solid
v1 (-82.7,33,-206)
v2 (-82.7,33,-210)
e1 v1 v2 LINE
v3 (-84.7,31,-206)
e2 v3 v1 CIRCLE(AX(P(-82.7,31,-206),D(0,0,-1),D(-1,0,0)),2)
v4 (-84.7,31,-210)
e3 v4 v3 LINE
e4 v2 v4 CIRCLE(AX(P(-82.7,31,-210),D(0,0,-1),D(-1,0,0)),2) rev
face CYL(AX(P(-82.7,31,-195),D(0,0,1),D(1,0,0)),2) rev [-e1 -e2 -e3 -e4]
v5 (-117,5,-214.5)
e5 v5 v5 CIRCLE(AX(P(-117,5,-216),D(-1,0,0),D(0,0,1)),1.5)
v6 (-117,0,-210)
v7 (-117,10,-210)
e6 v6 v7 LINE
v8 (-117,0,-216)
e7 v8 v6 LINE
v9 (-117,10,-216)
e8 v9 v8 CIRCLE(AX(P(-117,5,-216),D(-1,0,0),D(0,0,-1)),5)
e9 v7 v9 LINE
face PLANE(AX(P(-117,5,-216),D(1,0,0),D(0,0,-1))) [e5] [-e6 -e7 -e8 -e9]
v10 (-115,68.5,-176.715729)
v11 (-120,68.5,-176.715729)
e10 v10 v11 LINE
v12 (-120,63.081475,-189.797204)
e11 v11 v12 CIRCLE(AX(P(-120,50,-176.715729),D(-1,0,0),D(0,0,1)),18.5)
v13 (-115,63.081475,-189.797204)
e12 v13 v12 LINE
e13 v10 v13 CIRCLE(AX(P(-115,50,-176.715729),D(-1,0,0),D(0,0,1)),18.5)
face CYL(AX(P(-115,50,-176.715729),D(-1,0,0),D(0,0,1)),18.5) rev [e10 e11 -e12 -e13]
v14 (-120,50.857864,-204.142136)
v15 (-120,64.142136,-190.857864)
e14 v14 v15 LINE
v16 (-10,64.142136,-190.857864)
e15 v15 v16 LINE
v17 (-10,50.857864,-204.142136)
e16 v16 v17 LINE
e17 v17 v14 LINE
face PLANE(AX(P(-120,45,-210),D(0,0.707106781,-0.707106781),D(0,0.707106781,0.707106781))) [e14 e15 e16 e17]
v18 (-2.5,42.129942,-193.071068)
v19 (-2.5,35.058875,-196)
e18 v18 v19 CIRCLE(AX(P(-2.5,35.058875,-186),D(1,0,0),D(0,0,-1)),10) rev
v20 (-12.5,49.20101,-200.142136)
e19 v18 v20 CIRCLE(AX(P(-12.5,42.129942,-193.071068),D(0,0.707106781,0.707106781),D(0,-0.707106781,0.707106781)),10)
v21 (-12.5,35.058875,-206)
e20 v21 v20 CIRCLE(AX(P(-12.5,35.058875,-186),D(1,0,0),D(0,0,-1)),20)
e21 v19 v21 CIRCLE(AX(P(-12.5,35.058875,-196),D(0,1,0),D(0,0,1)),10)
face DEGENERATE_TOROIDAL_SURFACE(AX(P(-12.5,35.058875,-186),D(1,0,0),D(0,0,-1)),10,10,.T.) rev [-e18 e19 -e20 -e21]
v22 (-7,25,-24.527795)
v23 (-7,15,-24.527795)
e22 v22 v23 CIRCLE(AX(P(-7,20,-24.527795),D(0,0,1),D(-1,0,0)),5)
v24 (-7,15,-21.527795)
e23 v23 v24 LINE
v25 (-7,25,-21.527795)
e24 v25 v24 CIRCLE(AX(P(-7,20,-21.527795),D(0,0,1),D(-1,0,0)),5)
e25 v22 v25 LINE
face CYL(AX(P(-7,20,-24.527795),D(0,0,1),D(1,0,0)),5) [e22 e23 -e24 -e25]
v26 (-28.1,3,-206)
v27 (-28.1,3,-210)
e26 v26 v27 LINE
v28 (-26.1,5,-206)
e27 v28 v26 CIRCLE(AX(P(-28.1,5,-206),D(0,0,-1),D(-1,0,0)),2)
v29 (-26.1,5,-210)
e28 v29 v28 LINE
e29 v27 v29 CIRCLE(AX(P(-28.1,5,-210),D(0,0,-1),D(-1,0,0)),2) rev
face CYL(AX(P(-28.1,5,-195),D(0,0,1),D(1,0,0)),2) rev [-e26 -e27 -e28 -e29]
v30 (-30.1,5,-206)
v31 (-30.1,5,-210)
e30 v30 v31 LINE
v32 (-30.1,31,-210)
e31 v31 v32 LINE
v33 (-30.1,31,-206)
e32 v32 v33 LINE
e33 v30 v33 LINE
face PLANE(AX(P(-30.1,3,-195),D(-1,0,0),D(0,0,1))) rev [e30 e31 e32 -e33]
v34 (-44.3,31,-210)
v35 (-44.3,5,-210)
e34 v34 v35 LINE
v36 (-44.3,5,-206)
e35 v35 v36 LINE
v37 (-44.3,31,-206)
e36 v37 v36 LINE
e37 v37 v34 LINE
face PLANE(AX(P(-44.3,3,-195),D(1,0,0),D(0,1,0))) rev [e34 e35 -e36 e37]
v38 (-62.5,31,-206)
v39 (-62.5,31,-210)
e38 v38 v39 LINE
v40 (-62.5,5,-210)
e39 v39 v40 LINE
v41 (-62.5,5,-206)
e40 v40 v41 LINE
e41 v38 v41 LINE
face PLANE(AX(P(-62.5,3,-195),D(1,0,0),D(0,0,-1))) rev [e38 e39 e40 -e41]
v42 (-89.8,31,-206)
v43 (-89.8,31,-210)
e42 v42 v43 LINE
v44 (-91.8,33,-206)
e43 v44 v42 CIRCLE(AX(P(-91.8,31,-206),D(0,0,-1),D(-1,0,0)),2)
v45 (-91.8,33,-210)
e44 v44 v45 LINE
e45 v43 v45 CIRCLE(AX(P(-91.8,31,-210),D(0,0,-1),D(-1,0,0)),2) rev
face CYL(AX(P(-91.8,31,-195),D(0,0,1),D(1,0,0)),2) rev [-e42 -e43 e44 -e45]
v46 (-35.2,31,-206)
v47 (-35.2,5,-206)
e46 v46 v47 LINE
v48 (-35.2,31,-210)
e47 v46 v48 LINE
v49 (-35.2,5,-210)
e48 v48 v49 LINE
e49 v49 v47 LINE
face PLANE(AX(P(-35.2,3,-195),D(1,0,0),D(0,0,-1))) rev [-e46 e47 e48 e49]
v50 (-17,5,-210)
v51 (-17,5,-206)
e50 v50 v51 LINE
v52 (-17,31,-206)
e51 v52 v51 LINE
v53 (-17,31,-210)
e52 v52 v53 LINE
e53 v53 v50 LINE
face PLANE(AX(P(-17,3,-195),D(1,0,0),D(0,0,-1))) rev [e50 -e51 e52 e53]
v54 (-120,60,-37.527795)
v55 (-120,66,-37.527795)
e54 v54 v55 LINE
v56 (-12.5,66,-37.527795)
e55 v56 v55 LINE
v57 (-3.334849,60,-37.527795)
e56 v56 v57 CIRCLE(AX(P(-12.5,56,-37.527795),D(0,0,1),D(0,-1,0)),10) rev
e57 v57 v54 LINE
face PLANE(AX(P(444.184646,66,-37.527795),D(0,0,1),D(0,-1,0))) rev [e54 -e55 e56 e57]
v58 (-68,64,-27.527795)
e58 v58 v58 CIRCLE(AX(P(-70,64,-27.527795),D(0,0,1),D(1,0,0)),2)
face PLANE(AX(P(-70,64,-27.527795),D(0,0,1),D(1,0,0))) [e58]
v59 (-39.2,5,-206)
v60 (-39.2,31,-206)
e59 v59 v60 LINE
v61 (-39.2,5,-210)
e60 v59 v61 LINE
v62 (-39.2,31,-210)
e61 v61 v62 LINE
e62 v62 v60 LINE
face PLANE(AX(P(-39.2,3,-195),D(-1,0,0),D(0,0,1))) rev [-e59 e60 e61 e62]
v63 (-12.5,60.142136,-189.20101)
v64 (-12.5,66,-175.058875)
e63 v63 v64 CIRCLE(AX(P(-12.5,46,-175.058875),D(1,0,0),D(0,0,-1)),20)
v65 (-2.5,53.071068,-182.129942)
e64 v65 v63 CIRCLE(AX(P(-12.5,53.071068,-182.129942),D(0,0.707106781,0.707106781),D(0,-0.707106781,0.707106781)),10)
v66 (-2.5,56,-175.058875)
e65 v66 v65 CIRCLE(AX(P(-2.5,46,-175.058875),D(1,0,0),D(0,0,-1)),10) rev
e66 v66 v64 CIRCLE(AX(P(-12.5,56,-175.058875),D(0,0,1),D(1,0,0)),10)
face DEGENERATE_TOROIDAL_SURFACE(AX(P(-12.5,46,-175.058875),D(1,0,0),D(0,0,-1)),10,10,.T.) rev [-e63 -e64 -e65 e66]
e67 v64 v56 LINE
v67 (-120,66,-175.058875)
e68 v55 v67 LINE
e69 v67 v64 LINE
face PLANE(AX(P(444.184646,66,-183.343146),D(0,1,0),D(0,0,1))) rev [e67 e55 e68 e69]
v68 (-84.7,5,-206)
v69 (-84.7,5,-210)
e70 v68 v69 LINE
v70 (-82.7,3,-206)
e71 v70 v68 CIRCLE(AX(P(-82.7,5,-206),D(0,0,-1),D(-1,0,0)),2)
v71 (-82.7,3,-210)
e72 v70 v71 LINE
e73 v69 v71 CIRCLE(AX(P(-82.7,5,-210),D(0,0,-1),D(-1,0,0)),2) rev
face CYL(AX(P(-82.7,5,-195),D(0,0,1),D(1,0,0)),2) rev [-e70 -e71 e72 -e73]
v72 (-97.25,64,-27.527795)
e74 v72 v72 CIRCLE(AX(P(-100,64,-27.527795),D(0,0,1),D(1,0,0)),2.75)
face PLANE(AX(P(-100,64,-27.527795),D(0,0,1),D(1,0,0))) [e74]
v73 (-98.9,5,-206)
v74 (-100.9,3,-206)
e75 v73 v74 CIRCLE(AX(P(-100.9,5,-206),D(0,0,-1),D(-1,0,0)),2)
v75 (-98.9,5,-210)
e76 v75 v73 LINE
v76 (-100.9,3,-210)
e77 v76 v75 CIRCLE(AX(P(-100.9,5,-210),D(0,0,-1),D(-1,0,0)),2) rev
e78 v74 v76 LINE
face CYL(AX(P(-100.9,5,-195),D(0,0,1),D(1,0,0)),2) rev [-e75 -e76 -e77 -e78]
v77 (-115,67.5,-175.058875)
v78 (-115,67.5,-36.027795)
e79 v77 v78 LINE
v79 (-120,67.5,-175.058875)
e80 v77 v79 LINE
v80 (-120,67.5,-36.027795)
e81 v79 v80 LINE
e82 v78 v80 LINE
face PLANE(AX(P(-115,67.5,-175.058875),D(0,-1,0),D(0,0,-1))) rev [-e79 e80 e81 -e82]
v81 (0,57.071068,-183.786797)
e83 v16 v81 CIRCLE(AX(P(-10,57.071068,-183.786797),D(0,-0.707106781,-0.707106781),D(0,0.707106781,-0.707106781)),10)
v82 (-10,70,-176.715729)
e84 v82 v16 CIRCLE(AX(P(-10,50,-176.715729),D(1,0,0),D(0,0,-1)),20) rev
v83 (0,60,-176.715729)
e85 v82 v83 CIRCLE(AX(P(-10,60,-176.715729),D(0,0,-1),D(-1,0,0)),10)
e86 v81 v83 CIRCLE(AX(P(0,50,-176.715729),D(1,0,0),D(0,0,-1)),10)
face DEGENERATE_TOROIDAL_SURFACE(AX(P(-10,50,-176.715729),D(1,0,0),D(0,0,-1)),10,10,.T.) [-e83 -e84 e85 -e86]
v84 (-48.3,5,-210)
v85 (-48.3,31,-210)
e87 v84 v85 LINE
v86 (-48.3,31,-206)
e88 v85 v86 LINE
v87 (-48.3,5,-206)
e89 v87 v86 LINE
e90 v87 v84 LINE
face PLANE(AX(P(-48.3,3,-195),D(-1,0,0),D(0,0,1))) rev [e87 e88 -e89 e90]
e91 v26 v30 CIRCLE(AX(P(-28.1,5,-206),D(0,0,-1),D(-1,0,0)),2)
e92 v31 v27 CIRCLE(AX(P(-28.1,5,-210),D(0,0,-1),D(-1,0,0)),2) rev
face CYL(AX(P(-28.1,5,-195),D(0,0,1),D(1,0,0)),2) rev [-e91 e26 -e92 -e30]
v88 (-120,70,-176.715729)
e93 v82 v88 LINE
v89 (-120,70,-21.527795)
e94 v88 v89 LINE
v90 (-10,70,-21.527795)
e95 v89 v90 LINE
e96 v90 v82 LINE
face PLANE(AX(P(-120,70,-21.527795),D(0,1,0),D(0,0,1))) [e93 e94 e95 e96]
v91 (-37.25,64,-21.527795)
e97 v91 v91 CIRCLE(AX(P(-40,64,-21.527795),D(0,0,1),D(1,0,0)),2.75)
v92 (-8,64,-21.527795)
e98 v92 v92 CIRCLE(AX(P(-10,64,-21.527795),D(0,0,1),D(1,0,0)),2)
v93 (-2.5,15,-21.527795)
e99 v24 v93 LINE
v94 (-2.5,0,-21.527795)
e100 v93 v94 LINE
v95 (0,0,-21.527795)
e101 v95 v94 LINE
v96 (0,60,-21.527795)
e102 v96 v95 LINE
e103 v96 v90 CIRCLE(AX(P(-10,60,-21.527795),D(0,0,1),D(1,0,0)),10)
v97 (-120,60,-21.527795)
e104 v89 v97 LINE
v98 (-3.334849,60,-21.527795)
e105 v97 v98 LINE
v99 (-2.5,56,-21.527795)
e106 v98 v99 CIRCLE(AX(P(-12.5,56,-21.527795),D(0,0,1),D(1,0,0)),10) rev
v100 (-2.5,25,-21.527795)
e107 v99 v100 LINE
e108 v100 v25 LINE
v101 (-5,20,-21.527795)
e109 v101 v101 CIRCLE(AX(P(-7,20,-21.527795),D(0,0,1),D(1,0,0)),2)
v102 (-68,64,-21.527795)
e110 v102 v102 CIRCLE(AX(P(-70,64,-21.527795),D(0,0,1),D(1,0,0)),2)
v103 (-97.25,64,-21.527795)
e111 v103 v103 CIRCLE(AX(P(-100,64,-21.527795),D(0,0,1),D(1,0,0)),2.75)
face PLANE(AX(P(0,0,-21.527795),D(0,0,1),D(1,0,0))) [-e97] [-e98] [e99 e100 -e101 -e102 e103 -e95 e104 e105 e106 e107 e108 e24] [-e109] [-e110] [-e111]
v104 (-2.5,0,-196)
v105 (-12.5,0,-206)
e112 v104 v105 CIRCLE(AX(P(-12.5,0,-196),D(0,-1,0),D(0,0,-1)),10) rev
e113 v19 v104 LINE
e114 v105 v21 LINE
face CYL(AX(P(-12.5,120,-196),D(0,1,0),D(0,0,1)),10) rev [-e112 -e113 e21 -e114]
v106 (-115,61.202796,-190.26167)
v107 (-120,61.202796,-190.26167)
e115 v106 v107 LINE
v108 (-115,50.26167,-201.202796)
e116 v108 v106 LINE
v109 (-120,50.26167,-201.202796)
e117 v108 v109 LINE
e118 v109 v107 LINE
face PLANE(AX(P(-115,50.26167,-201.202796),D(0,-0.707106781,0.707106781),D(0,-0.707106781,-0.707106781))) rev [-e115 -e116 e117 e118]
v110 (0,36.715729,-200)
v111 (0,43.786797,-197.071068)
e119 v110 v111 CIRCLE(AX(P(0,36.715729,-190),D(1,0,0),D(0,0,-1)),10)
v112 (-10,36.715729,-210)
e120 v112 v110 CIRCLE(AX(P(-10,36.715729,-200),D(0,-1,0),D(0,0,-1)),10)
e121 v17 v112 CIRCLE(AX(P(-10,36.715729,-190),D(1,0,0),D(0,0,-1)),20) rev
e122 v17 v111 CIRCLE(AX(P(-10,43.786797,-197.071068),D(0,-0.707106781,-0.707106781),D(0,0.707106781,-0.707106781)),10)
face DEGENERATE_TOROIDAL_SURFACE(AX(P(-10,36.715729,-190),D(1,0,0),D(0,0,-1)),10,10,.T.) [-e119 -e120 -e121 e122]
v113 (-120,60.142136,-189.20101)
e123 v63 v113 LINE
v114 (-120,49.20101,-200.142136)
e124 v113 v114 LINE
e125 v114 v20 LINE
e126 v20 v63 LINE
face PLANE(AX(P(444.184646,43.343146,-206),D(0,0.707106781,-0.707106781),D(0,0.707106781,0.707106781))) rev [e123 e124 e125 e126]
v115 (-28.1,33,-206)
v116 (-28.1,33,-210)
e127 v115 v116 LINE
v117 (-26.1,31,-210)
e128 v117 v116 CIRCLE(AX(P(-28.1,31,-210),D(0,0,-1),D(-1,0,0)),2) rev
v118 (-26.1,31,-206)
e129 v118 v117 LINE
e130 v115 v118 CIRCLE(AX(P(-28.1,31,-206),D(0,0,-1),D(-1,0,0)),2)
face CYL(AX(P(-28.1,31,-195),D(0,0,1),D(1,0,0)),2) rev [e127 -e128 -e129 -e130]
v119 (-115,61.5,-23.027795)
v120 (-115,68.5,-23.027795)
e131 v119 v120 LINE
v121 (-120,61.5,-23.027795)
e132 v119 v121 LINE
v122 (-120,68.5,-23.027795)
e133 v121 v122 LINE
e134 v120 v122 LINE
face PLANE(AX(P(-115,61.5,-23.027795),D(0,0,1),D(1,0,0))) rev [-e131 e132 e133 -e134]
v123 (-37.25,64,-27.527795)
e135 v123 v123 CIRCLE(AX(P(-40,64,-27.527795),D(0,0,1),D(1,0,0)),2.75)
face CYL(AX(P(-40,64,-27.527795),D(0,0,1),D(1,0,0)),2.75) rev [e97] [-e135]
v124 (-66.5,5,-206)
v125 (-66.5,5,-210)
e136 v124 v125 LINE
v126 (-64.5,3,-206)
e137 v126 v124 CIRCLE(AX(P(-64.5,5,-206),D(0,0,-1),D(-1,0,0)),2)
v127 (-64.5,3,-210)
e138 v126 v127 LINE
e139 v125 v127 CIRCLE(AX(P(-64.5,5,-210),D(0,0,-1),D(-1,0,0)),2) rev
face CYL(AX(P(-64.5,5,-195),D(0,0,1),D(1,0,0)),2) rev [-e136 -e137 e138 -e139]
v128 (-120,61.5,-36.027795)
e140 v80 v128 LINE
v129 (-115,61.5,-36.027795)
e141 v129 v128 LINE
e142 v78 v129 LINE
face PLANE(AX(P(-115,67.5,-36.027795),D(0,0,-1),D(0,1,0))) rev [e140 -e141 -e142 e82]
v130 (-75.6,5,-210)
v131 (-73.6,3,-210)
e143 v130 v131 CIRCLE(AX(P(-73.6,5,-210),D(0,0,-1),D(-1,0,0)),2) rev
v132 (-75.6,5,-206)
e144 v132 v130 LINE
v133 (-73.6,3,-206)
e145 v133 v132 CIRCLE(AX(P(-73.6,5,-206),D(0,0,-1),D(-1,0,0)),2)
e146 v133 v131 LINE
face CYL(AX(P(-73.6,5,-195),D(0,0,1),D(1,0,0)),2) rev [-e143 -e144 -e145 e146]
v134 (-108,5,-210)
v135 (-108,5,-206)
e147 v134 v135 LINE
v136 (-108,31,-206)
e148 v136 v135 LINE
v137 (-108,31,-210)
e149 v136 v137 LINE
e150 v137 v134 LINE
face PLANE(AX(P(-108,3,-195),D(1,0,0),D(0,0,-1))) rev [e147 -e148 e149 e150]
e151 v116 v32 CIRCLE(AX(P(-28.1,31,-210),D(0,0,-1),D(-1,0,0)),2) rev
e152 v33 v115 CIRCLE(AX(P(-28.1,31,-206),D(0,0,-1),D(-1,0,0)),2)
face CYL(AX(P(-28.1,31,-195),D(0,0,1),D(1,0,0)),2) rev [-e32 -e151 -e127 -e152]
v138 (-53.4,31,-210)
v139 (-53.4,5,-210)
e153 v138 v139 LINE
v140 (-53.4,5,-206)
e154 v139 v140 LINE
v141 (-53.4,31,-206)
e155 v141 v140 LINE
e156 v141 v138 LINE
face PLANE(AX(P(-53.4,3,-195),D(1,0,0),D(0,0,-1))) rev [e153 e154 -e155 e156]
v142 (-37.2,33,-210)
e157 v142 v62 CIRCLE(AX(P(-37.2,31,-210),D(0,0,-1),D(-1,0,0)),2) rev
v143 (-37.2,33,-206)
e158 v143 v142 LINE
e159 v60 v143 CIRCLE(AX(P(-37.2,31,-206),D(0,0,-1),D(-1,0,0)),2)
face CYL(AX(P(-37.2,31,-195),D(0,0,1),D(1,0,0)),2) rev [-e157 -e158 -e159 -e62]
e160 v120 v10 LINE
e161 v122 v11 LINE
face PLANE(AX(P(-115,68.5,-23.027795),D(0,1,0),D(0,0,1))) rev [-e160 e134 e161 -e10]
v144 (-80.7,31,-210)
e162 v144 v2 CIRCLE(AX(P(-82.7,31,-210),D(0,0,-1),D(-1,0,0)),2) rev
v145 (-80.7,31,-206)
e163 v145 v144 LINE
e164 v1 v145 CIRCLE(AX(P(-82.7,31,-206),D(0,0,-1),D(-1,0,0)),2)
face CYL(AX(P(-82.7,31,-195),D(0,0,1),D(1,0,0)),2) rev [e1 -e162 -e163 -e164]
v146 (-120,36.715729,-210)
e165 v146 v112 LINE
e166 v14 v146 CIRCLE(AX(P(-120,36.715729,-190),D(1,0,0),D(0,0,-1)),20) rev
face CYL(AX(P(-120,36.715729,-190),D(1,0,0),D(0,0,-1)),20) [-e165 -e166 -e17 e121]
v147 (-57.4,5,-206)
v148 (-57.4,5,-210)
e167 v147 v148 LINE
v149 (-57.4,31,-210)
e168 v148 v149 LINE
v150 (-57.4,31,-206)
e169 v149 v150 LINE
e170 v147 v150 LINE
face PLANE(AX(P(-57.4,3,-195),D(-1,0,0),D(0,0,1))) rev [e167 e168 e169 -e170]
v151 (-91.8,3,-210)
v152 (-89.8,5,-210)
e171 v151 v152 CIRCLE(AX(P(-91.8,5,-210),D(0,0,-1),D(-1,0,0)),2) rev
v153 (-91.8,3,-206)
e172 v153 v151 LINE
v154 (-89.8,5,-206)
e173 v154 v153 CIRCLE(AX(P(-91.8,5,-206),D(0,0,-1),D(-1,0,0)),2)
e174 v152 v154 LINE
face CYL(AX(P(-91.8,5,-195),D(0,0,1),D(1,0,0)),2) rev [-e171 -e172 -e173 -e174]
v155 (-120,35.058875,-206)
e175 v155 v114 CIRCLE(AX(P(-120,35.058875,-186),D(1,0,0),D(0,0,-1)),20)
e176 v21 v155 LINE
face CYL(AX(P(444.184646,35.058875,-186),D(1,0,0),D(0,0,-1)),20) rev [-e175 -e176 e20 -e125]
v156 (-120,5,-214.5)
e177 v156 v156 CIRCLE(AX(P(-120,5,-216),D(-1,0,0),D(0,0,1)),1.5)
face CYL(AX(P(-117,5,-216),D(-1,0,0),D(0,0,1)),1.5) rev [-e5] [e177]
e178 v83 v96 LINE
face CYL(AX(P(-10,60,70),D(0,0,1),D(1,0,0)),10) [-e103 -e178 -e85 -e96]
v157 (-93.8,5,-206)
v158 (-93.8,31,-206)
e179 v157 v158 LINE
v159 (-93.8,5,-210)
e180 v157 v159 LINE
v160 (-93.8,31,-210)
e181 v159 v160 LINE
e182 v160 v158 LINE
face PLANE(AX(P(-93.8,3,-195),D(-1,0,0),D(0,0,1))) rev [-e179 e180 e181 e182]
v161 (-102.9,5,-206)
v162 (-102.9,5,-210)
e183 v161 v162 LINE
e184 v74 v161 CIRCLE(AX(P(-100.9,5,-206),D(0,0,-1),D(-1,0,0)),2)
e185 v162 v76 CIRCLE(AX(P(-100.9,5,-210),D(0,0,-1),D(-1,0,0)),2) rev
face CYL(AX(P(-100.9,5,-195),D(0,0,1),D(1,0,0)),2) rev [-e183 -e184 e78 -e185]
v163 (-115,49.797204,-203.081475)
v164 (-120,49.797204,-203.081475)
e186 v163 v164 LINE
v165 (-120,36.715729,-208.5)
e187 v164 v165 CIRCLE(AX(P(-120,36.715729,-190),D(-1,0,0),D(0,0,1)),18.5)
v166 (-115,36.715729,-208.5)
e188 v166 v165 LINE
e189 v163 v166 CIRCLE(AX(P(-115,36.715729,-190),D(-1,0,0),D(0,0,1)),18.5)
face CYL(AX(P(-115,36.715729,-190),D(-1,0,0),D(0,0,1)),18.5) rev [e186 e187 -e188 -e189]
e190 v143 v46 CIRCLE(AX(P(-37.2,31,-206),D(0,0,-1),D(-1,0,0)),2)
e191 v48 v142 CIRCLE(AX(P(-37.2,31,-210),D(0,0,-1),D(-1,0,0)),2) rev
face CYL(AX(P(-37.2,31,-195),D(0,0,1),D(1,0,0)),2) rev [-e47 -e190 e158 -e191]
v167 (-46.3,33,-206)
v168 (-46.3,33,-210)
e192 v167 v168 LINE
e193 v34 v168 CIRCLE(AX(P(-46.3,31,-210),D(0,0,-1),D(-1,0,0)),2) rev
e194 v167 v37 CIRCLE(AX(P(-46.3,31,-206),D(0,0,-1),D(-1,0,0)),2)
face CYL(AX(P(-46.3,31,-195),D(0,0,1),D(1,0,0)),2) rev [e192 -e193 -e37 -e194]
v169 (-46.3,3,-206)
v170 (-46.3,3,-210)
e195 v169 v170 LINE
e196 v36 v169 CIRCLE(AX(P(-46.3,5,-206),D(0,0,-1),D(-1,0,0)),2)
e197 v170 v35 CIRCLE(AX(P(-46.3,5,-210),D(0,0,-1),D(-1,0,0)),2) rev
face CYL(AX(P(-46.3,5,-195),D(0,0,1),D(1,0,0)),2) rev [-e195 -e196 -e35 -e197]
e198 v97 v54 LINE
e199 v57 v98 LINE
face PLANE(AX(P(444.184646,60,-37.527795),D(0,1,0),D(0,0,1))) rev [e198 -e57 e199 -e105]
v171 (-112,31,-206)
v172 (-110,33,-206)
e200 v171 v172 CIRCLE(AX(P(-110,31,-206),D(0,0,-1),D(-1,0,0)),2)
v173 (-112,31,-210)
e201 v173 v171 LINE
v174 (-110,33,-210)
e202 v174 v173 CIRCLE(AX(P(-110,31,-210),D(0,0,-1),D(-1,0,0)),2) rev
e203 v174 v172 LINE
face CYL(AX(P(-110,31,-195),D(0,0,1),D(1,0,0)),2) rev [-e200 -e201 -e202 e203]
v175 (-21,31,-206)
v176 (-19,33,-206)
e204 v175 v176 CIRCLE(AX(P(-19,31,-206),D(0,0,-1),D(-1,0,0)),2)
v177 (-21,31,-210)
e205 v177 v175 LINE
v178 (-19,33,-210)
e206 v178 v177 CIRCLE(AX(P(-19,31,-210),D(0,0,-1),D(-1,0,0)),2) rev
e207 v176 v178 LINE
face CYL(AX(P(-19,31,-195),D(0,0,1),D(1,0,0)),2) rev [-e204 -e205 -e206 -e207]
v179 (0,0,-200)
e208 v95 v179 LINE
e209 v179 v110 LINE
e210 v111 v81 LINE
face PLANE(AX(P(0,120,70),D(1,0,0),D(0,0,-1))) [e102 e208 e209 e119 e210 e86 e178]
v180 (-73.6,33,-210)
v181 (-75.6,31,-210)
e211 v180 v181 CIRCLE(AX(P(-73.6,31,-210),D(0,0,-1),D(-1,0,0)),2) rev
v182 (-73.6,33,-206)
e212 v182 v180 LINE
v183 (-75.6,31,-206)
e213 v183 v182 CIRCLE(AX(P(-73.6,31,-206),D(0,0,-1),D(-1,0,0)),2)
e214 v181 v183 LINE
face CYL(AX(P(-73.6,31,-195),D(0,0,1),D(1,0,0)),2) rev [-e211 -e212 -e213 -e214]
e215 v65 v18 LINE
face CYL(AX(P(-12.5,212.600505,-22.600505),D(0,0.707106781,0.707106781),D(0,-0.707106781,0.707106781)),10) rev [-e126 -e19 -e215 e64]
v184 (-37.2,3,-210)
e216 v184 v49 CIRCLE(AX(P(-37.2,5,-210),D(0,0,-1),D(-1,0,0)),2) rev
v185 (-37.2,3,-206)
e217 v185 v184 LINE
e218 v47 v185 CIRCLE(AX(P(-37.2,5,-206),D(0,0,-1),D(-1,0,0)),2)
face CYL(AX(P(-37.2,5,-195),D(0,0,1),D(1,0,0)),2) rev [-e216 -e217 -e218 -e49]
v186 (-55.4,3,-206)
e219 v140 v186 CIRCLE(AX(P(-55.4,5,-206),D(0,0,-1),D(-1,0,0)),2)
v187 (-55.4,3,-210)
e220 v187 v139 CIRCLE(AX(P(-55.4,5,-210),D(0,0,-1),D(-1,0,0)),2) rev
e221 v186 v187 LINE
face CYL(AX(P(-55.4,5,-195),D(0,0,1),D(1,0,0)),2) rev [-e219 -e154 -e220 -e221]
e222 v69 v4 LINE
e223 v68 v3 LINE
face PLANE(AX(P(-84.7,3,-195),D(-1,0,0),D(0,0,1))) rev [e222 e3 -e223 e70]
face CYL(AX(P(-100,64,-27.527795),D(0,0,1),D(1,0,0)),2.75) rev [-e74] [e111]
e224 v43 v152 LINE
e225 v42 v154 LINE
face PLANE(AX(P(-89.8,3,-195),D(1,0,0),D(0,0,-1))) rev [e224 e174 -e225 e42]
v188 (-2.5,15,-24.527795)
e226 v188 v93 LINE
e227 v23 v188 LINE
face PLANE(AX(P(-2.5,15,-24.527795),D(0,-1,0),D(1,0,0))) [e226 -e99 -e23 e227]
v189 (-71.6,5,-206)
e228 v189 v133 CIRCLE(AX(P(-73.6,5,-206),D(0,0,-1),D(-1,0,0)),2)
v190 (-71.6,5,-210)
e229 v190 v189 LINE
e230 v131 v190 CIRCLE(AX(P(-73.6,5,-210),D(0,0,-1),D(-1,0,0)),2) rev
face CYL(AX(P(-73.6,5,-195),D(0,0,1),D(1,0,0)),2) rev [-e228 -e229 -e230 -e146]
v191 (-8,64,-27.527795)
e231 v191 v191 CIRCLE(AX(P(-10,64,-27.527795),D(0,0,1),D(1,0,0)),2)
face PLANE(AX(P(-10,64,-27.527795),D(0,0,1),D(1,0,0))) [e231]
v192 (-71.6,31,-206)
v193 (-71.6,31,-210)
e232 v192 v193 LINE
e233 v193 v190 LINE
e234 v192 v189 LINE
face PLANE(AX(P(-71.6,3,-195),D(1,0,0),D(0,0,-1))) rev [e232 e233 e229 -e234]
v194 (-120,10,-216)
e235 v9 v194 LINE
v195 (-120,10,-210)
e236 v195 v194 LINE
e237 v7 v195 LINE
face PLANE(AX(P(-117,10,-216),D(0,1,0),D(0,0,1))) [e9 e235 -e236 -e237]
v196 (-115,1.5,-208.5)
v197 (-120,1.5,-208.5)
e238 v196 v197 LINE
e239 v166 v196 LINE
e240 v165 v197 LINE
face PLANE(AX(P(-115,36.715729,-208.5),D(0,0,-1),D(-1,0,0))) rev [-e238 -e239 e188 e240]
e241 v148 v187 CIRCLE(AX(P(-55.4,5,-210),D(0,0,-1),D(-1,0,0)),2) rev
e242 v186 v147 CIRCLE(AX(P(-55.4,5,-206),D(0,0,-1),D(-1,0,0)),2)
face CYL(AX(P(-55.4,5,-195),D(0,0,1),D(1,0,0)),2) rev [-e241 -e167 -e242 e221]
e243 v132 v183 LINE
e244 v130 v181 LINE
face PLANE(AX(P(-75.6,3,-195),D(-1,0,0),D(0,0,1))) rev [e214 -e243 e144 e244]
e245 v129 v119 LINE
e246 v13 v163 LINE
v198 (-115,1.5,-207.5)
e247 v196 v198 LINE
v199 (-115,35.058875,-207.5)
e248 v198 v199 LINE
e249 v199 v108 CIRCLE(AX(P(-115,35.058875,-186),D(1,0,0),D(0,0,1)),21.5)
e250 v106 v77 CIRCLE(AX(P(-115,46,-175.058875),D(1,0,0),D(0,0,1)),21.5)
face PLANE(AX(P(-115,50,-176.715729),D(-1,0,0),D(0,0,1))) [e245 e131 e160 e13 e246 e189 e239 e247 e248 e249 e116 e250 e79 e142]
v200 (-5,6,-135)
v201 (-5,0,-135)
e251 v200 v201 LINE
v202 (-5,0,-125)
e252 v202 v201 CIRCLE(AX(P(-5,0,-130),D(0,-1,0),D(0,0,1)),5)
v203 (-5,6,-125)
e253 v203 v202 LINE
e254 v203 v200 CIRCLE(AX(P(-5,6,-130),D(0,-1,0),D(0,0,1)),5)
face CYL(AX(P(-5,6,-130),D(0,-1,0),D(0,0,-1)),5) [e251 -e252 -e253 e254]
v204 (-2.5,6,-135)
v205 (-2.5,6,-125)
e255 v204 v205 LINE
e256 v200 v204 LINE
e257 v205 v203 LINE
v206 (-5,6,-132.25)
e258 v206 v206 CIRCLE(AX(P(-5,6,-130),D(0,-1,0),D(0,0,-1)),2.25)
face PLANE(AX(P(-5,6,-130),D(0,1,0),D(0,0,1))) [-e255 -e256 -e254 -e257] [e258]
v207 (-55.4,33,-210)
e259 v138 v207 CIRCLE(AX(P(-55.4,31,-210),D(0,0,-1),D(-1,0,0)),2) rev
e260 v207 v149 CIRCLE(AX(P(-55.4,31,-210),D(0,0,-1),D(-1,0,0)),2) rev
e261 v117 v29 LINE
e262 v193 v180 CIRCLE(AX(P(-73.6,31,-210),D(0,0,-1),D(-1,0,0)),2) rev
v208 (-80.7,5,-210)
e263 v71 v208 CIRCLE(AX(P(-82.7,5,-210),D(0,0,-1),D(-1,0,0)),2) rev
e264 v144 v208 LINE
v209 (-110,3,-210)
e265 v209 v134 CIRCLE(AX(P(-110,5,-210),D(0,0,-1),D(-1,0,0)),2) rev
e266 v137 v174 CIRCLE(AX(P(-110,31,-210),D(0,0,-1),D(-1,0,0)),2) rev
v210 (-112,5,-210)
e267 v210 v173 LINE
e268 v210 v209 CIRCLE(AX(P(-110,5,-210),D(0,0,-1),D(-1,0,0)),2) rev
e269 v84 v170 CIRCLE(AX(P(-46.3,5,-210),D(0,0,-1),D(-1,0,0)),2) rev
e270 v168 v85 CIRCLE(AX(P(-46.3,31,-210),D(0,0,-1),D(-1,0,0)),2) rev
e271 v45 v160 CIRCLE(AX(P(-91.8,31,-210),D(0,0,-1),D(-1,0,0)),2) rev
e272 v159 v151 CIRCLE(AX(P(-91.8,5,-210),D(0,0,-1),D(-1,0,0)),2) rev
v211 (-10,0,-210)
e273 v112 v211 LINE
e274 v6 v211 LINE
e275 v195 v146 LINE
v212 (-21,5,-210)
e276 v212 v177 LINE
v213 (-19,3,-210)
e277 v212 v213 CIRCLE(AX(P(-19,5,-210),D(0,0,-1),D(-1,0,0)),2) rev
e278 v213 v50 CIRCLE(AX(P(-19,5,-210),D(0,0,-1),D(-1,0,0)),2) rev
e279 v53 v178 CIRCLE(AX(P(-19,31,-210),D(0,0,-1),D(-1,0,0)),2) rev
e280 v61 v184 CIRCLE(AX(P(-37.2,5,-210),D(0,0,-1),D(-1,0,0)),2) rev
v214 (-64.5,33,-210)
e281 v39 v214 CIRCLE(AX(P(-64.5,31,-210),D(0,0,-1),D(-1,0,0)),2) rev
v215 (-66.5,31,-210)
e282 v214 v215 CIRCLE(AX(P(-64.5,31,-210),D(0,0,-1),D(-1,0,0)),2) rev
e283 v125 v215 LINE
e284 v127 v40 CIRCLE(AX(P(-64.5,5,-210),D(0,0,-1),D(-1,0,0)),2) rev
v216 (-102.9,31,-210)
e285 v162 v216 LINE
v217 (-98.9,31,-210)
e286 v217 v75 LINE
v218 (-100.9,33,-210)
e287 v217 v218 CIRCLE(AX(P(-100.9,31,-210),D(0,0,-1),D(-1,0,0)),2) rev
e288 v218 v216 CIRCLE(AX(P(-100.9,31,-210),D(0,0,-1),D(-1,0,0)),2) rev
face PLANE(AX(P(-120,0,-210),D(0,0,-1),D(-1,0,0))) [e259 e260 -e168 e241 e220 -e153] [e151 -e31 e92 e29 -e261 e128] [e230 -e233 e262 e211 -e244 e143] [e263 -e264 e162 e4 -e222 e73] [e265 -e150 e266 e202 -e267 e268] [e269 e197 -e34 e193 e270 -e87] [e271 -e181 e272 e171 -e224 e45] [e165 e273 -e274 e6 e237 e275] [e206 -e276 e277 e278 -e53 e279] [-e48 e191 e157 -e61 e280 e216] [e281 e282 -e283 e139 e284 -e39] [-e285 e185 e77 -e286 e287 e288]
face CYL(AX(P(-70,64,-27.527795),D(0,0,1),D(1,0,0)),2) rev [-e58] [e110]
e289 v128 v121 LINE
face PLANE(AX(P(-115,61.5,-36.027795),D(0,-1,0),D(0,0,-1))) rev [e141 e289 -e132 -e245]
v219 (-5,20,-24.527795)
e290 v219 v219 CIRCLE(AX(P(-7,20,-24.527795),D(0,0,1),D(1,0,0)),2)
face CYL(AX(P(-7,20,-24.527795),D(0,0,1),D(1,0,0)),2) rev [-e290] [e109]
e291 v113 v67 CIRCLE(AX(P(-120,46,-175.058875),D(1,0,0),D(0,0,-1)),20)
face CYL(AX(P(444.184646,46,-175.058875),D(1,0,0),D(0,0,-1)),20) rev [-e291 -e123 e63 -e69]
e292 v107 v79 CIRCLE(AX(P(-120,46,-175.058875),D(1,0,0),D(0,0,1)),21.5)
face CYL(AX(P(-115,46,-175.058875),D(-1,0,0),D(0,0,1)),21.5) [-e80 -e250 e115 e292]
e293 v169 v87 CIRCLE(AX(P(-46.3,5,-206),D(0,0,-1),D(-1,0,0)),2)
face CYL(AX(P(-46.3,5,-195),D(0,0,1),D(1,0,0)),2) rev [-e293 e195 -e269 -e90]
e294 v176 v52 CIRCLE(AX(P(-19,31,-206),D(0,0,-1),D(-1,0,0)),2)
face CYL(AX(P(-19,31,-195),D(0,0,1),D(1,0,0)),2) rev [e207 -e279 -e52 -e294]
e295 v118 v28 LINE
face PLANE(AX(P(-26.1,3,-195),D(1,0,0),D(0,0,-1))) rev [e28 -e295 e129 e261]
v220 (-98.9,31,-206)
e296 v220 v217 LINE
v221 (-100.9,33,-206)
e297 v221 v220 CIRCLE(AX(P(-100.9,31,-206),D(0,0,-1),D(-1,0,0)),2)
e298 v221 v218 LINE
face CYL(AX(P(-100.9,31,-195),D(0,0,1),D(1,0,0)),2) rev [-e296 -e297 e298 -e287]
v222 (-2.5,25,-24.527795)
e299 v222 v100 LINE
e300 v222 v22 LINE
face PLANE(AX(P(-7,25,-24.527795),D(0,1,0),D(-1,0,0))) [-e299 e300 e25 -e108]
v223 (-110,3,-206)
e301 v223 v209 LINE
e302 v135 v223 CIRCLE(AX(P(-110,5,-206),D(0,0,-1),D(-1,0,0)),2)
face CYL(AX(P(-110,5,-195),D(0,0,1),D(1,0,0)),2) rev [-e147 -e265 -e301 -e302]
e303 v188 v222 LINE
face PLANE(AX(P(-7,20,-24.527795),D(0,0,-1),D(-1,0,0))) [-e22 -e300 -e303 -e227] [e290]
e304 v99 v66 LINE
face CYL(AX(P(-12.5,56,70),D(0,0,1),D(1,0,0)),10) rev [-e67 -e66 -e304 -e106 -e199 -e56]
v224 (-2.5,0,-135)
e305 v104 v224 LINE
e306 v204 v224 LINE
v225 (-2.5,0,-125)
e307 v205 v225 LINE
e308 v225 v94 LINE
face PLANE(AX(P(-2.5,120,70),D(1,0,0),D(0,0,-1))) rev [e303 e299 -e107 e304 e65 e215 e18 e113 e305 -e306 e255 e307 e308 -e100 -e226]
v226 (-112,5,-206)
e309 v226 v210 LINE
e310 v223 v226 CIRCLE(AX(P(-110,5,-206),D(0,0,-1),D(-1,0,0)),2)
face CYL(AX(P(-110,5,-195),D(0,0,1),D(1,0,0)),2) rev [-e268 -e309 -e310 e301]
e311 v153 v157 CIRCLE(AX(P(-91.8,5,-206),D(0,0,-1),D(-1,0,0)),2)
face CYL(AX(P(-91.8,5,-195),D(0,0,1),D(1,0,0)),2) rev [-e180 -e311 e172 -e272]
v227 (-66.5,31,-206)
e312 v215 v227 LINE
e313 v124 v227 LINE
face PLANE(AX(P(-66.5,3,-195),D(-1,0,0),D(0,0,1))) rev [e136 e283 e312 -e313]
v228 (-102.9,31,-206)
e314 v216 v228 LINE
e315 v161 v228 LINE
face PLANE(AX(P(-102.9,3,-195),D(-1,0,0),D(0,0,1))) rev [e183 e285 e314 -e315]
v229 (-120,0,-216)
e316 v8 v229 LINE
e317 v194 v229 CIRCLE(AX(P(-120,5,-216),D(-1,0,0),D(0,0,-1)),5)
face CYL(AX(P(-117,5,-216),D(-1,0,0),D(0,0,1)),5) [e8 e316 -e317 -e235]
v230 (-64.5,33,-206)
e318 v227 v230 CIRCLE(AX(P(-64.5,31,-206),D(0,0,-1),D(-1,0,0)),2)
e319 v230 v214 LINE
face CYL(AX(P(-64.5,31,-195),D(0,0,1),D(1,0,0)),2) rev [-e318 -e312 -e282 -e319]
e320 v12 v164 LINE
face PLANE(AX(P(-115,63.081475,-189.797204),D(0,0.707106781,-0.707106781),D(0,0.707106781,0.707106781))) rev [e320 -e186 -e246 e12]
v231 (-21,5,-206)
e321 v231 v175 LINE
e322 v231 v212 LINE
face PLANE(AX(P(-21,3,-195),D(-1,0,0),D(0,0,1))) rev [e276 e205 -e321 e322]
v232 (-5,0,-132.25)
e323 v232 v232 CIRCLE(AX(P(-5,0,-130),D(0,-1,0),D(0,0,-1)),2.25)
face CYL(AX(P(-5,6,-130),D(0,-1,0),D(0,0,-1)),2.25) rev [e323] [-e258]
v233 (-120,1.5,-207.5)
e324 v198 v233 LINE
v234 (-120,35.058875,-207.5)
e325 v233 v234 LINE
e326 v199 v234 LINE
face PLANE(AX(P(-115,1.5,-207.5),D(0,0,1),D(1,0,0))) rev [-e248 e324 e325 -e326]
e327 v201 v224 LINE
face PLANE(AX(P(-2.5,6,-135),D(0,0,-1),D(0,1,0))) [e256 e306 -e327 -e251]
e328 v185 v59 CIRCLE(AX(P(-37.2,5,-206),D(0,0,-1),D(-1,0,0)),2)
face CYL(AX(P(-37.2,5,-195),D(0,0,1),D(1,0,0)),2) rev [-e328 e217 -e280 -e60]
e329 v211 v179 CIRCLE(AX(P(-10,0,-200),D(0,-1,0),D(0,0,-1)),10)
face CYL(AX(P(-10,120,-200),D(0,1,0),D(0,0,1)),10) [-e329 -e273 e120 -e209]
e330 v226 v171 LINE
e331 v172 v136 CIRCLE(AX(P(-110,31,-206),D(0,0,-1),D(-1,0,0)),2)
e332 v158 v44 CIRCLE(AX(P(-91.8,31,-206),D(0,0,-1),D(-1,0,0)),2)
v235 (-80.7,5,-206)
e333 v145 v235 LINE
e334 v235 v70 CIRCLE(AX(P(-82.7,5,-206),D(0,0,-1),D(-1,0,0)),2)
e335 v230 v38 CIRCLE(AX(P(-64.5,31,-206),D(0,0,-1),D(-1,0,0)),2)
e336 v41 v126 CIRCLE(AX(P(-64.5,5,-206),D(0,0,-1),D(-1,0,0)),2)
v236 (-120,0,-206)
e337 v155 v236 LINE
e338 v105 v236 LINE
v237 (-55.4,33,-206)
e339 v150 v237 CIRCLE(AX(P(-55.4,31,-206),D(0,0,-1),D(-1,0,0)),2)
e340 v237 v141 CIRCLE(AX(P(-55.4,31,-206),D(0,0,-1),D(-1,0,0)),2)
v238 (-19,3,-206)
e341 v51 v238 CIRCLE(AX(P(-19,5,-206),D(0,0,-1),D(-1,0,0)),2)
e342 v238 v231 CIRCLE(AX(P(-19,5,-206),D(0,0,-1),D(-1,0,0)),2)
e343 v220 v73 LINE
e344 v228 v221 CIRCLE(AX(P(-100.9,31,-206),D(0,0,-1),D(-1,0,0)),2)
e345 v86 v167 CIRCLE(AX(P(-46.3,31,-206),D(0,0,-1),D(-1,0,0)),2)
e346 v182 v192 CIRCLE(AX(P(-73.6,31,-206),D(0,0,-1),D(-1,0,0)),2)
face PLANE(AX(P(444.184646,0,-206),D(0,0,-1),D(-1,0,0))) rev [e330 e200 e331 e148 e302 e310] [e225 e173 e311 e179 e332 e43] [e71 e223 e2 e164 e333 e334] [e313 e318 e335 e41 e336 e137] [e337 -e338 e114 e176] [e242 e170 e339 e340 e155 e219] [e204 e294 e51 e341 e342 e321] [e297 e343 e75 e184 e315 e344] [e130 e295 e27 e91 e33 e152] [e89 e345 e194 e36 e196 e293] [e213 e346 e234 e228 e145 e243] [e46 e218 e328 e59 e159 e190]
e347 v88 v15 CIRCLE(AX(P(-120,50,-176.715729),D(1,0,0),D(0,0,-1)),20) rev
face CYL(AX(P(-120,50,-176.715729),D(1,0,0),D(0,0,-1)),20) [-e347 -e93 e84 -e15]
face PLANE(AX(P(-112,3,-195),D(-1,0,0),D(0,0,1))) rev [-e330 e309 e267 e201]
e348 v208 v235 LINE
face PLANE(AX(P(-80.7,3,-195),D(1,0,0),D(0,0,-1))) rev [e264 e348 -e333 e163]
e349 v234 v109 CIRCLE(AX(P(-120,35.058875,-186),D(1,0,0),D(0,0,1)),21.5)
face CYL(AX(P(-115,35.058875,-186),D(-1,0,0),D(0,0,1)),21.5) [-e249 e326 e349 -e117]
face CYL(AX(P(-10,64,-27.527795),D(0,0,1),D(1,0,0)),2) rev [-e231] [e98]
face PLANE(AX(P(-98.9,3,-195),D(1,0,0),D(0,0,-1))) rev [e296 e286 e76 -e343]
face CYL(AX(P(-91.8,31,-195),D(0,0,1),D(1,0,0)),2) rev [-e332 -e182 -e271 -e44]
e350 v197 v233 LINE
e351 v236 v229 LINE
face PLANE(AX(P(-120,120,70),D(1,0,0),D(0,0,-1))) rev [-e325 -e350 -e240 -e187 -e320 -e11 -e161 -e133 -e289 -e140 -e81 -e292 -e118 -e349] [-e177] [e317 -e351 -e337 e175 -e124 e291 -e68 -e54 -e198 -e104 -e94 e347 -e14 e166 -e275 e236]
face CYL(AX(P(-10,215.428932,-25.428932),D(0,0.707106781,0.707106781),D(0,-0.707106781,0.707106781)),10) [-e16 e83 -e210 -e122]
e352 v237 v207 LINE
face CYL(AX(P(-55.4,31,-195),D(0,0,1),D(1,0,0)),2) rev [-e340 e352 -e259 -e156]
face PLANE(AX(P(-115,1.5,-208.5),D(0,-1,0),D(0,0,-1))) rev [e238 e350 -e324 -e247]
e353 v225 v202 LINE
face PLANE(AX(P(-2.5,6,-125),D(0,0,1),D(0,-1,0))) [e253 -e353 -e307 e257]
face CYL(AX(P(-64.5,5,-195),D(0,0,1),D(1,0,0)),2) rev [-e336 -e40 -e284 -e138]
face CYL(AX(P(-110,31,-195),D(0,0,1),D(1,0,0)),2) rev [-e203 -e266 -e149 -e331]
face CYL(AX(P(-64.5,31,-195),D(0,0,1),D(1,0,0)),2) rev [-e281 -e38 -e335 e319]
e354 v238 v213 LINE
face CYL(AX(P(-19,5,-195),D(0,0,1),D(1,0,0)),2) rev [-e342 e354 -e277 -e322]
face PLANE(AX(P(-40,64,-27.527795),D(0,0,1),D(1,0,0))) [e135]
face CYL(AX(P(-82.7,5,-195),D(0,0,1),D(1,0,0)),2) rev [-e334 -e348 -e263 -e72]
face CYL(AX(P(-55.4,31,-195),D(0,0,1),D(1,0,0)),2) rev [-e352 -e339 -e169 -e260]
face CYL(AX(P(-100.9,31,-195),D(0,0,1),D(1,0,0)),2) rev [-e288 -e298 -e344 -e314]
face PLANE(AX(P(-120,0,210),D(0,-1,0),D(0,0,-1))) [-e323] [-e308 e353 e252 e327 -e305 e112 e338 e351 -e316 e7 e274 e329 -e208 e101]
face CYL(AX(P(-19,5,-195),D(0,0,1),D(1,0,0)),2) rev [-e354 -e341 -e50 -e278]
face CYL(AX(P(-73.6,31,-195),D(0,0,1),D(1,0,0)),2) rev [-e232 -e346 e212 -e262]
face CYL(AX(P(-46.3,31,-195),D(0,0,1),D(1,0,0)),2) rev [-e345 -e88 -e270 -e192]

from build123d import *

# Parameters (mm, degrees)
CROQUIS1_R              = 13
SALIENTE_EXTRUIR1_DEPTH = 120
CORTAR_EXTRUIR1_DEPTH   = 117.5
REDONDEO1_R             = 20
CROQUIS3_W              = 250
CROQUIS3_H              = 250
CORTAR_EXTRUIR2_DEPTH   = 312.295872079
CORTAR_EXTRUIR4_DEPTH   = 5
CROQUIS7_R              = 2.75
CROQUIS7_R_2            = 2
CORTAR_EXTRUIR5_DEPTH   = 6
REDONDEO5_R             = 10
CROQUIS8_W              = 4
CROQUIS8_H              = 30
CORTAR_EXTRUIR6_DEPTH   = 15
REDONDEO6_R             = 2
CROQUIS9_R              = 2.25
SALIENTE_EXTRUIR3_DEPTH = 6
CROQUIS10_R             = 1.5
SALIENTE_EXTRUIR4_DEPTH = 3
CROQUIS11_R             = 2
SALIENTE_EXTRUIR5_DEPTH = 3


with BuildPart() as part:
    # Croquis1 → Saliente-Extruir1 (new body)
    with BuildSketch(Plane(origin=(0, 0, 0), x_dir=(0, 0, -1), z_dir=(1, 0, 0))):
        with BuildLine():
            Line((-210, 0), (210, 0))
            Line((210, 0), (210, 45))
            Line((210, 45), (185, 70))
            Line((185, 70), (21.52779525, 70))
            Line((21.52779525, 70), (21.52779525, 75))
            Line((21.52779525, 75), (-28.77527986, 148.293505427))
            ThreePointArc((-28.77527986, 148.293505427), (-68.645544514, 169.981651137), (-109.631887894, 150.484643051))
            Line((-109.631887894, 150.484643051), (-210, 20))
            Line((-210, 20), (-210, 0))
        make_face()
        with Locations((-70, 120)):
            Circle(CROQUIS1_R, mode=Mode.SUBTRACT)
    extrude(amount=-SALIENTE_EXTRUIR1_DEPTH)

    # Croquis2 → Cortar-Extruir1 (cut)
    with BuildSketch(Plane.ZY.offset(120)):
        with BuildLine():
            Line((106.461336862, 148.045871607), (206, 18.639562604))
            Line((206, 18.639562604), (206, 0))
            Line((206, 0), (-206, 0))
            Line((-206, 0), (-206, 43.343145751))
            Line((-206, 43.343145751), (-183.343145751, 66))
            Line((-183.343145751, 66), (-37.52779525, 66))
            Line((-37.52779525, 66), (-37.52779525, 60))
            Line((-37.52779525, 60), (-17.52779525, 60))
            Line((-17.52779525, 60), (-17.52779525, 73.759393051))
            Line((-17.52779525, 73.759393051), (32.073257471, 146.030024993))
            ThreePointArc((32.073257471, 146.030024993), (68.753900953, 165.983119046), (106.461336862, 148.045871607))
        make_face()
    extrude(amount=-CORTAR_EXTRUIR1_DEPTH, mode=Mode.SUBTRACT)

    # Redondeo1
    redondeo1_edges = [part.edges().sort_by_distance(p)[0] for p in [
        (-60, 20, 210),
        (-60, 70, -185),
        (-60, 45, -210),
        (-61.25, 66, -183.343145751),
        (-61.25, 43.343145751, -206),
        (-61.25, 18.639562604, 206),
    ]]
    fillet(redondeo1_edges, radius=REDONDEO1_R)

    # Croquis3 → Cortar-Extruir2 (cut, through all)
    with BuildSketch(Plane(origin=(0, 0, -21.52779525), x_dir=(-1, 0, 0), z_dir=(0, 0, -1))):
        with Locations((60, 70)):
            Rectangle(CROQUIS3_W, CROQUIS3_H)
    extrude(amount=-CORTAR_EXTRUIR2_DEPTH, mode=Mode.SUBTRACT)

    # Croquis6 → Cortar-Extruir4 (cut)
    with BuildSketch(Plane.ZY.offset(120)):
        with BuildLine():
            Line((-23.02779525, 61.5), (-23.02779525, 68.5))
            Line((-23.02779525, 68.5), (-176.715728753, 68.5))
            ThreePointArc((-176.715728753, 68.5), (-183.795372251, 67.091771351), (-189.797204204, 63.081475452))
            Line((-189.797204204, 63.081475452), (-203.081475452, 49.797204204))
            ThreePointArc((-203.081475452, 49.797204204), (-207.091771351, 43.795372251), (-208.5, 36.715728753))
            Line((-208.5, 36.715728753), (-208.5, 1.5))
            Line((-208.5, 1.5), (-207.5, 1.5))
            Line((-207.5, 1.5), (-207.5, 35.058874503))
            ThreePointArc((-207.5, 35.058874503), (-205.863409949, 43.286568299), (-201.202795796, 50.261670299))
            Line((-201.202795796, 50.261670299), (-190.261670299, 61.202795796))
            ThreePointArc((-190.261670299, 61.202795796), (-183.286568299, 65.863409949), (-175.058874503, 67.5))
            Line((-175.058874503, 67.5), (-36.02779525, 67.5))
            Line((-36.02779525, 67.5), (-36.02779525, 61.5))
            Line((-36.02779525, 61.5), (-23.02779525, 61.5))
        make_face()
    extrude(amount=-CORTAR_EXTRUIR4_DEPTH, mode=Mode.SUBTRACT)

    # Croquis7 → Cortar-Extruir5 (cut)
    with BuildSketch(Plane.XY.offset(-21.52779525)):
        with Locations((-40, 64)):
            Circle(CROQUIS7_R)
        with Locations((-100, 64)):
            Circle(CROQUIS7_R)
        with Locations((-70, 64)):
            Circle(CROQUIS7_R_2)
        with Locations((-10, 64)):
            Circle(CROQUIS7_R_2)
    extrude(amount=-CORTAR_EXTRUIR5_DEPTH, mode=Mode.SUBTRACT)

    # Redondeo5
    redondeo5_edges = [part.edges().sort_by_distance(p)[0] for p in [
        (0, 18.357864376, -210),
        (0, 44.3693974, -208.47759065),
        (0, 57.5, -197.5),
        (0, 68.47759065, -184.3693974),
        (0, 70, -99.121762001),
        (-2.5, 17.529437252, -206),
        (-2.5, 42.71254315, -204.47759065),
        (-2.5, 54.671572875, -194.671572875),
        (-2.5, 64.47759065, -182.71254315),
        (-2.5, 66, -106.293334877),
    ]]
    fillet(redondeo5_edges, radius=REDONDEO5_R)

    # Croquis8 → Cortar-Extruir6 (cut)
    with BuildSketch(Plane(origin=(0, 0, -210), x_dir=(-1, 0, 0), z_dir=(0, 0, -1))):
        with Locations((110, 18)):
            Rectangle(CROQUIS8_W, CROQUIS8_H)
        with Locations((100.9, 18)):
            Rectangle(CROQUIS8_W, CROQUIS8_H)
        with Locations((91.8, 18)):
            Rectangle(CROQUIS8_W, CROQUIS8_H)
        with Locations((82.7, 18)):
            Rectangle(CROQUIS8_W, CROQUIS8_H)
        with Locations((73.6, 18)):
            Rectangle(CROQUIS8_W, CROQUIS8_H)
        with Locations((64.5, 18)):
            Rectangle(CROQUIS8_W, CROQUIS8_H)
        with Locations((55.4, 18)):
            Rectangle(CROQUIS8_W, CROQUIS8_H)
        with Locations((46.3, 18)):
            Rectangle(CROQUIS8_W, CROQUIS8_H)
        with Locations((37.2, 18)):
            Rectangle(CROQUIS8_W, CROQUIS8_H)
        with Locations((28.1, 18)):
            Rectangle(CROQUIS8_W, CROQUIS8_H)
        with Locations((19, 18)):
            Rectangle(CROQUIS8_W, CROQUIS8_H)
    extrude(amount=-CORTAR_EXTRUIR6_DEPTH, mode=Mode.SUBTRACT)

    # Redondeo6
    redondeo6_edges = [part.edges().sort_by_distance(p)[0] for p in [
        (-21, 3, -208),
        (-17, 3, -208),
        (-17, 33, -208),
        (-30.1, 3, -208),
        (-26.1, 3, -208),
        (-26.1, 33, -208),
        (-30.1, 33, -208),
        (-39.2, 3, -208),
        (-35.2, 3, -208),
        (-35.2, 33, -208),
        (-39.2, 33, -208),
        (-48.3, 3, -208),
        (-44.3, 3, -208),
        (-44.3, 33, -208),
        (-48.3, 33, -208),
        (-57.4, 3, -208),
        (-53.4, 3, -208),
        (-53.4, 33, -208),
        (-57.4, 33, -208),
        (-66.5, 3, -208),
        (-62.5, 3, -208),
        (-62.5, 33, -208),
        (-66.5, 33, -208),
        (-75.6, 3, -208),
        (-71.6, 3, -208),
        (-71.6, 33, -208),
        (-75.6, 33, -208),
        (-84.7, 3, -208),
        (-80.7, 3, -208),
        (-80.7, 33, -208),
        (-84.7, 33, -208),
        (-93.8, 3, -208),
        (-89.8, 3, -208),
        (-89.8, 33, -208),
        (-93.8, 33, -208),
        (-102.9, 3, -208),
        (-98.9, 3, -208),
        (-98.9, 33, -208),
        (-102.9, 33, -208),
        (-112, 33, -208),
        (-112, 3, -208),
        (-108, 3, -208),
        (-108, 33, -208),
        (-21, 33, -208),
    ]]
    fillet(redondeo6_edges, radius=REDONDEO6_R - 0.0001)  # a hair under: the kernel refuses the full size

    # Croquis9 → Saliente-Extruir3 (add)
    with BuildSketch(Plane.XZ):
        with BuildLine():
            Line((-2.5, -125), (-5, -125))
            ThreePointArc((-5, -125), (-10, -130), (-5, -135))
            Line((-5, -135), (-2.5, -135))
            Line((-2.5, -135), (-2.5, -125))
        make_face()
        with Locations(Location((-5, -130, 0), (0, 0, 270))):
            Circle(CROQUIS9_R, mode=Mode.SUBTRACT)
    extrude(amount=-SALIENTE_EXTRUIR3_DEPTH)

    # Croquis10 → Saliente-Extruir4 (add)
    with BuildSketch(Plane.ZY.offset(120)):
        with BuildLine():
            Line((-210, 0), (-216, 0))
            ThreePointArc((-216, 0), (-221, 5), (-216, 10))
            Line((-216, 10), (-210, 10))
            Line((-210, 10), (-210, 0))
        make_face()
        with Locations((-216, 5)):
            Circle(CROQUIS10_R, mode=Mode.SUBTRACT)
    extrude(amount=-SALIENTE_EXTRUIR4_DEPTH)

    # Croquis11 → Saliente-Extruir5 (add)
    with BuildSketch(Plane.XY.offset(-21.52779525)):
        with BuildLine():
            Line((-2.5, 15), (-7, 15))
            ThreePointArc((-7, 15), (-12, 20), (-7, 25))
            Line((-7, 25), (-2.5, 25))
            Line((-2.5, 25), (-2.5, 15))
        make_face()
        with Locations((-7, 20)):
            Circle(CROQUIS11_R, mode=Mode.SUBTRACT)
    extrude(amount=-SALIENTE_EXTRUIR5_DEPTH)


solid = part.part
